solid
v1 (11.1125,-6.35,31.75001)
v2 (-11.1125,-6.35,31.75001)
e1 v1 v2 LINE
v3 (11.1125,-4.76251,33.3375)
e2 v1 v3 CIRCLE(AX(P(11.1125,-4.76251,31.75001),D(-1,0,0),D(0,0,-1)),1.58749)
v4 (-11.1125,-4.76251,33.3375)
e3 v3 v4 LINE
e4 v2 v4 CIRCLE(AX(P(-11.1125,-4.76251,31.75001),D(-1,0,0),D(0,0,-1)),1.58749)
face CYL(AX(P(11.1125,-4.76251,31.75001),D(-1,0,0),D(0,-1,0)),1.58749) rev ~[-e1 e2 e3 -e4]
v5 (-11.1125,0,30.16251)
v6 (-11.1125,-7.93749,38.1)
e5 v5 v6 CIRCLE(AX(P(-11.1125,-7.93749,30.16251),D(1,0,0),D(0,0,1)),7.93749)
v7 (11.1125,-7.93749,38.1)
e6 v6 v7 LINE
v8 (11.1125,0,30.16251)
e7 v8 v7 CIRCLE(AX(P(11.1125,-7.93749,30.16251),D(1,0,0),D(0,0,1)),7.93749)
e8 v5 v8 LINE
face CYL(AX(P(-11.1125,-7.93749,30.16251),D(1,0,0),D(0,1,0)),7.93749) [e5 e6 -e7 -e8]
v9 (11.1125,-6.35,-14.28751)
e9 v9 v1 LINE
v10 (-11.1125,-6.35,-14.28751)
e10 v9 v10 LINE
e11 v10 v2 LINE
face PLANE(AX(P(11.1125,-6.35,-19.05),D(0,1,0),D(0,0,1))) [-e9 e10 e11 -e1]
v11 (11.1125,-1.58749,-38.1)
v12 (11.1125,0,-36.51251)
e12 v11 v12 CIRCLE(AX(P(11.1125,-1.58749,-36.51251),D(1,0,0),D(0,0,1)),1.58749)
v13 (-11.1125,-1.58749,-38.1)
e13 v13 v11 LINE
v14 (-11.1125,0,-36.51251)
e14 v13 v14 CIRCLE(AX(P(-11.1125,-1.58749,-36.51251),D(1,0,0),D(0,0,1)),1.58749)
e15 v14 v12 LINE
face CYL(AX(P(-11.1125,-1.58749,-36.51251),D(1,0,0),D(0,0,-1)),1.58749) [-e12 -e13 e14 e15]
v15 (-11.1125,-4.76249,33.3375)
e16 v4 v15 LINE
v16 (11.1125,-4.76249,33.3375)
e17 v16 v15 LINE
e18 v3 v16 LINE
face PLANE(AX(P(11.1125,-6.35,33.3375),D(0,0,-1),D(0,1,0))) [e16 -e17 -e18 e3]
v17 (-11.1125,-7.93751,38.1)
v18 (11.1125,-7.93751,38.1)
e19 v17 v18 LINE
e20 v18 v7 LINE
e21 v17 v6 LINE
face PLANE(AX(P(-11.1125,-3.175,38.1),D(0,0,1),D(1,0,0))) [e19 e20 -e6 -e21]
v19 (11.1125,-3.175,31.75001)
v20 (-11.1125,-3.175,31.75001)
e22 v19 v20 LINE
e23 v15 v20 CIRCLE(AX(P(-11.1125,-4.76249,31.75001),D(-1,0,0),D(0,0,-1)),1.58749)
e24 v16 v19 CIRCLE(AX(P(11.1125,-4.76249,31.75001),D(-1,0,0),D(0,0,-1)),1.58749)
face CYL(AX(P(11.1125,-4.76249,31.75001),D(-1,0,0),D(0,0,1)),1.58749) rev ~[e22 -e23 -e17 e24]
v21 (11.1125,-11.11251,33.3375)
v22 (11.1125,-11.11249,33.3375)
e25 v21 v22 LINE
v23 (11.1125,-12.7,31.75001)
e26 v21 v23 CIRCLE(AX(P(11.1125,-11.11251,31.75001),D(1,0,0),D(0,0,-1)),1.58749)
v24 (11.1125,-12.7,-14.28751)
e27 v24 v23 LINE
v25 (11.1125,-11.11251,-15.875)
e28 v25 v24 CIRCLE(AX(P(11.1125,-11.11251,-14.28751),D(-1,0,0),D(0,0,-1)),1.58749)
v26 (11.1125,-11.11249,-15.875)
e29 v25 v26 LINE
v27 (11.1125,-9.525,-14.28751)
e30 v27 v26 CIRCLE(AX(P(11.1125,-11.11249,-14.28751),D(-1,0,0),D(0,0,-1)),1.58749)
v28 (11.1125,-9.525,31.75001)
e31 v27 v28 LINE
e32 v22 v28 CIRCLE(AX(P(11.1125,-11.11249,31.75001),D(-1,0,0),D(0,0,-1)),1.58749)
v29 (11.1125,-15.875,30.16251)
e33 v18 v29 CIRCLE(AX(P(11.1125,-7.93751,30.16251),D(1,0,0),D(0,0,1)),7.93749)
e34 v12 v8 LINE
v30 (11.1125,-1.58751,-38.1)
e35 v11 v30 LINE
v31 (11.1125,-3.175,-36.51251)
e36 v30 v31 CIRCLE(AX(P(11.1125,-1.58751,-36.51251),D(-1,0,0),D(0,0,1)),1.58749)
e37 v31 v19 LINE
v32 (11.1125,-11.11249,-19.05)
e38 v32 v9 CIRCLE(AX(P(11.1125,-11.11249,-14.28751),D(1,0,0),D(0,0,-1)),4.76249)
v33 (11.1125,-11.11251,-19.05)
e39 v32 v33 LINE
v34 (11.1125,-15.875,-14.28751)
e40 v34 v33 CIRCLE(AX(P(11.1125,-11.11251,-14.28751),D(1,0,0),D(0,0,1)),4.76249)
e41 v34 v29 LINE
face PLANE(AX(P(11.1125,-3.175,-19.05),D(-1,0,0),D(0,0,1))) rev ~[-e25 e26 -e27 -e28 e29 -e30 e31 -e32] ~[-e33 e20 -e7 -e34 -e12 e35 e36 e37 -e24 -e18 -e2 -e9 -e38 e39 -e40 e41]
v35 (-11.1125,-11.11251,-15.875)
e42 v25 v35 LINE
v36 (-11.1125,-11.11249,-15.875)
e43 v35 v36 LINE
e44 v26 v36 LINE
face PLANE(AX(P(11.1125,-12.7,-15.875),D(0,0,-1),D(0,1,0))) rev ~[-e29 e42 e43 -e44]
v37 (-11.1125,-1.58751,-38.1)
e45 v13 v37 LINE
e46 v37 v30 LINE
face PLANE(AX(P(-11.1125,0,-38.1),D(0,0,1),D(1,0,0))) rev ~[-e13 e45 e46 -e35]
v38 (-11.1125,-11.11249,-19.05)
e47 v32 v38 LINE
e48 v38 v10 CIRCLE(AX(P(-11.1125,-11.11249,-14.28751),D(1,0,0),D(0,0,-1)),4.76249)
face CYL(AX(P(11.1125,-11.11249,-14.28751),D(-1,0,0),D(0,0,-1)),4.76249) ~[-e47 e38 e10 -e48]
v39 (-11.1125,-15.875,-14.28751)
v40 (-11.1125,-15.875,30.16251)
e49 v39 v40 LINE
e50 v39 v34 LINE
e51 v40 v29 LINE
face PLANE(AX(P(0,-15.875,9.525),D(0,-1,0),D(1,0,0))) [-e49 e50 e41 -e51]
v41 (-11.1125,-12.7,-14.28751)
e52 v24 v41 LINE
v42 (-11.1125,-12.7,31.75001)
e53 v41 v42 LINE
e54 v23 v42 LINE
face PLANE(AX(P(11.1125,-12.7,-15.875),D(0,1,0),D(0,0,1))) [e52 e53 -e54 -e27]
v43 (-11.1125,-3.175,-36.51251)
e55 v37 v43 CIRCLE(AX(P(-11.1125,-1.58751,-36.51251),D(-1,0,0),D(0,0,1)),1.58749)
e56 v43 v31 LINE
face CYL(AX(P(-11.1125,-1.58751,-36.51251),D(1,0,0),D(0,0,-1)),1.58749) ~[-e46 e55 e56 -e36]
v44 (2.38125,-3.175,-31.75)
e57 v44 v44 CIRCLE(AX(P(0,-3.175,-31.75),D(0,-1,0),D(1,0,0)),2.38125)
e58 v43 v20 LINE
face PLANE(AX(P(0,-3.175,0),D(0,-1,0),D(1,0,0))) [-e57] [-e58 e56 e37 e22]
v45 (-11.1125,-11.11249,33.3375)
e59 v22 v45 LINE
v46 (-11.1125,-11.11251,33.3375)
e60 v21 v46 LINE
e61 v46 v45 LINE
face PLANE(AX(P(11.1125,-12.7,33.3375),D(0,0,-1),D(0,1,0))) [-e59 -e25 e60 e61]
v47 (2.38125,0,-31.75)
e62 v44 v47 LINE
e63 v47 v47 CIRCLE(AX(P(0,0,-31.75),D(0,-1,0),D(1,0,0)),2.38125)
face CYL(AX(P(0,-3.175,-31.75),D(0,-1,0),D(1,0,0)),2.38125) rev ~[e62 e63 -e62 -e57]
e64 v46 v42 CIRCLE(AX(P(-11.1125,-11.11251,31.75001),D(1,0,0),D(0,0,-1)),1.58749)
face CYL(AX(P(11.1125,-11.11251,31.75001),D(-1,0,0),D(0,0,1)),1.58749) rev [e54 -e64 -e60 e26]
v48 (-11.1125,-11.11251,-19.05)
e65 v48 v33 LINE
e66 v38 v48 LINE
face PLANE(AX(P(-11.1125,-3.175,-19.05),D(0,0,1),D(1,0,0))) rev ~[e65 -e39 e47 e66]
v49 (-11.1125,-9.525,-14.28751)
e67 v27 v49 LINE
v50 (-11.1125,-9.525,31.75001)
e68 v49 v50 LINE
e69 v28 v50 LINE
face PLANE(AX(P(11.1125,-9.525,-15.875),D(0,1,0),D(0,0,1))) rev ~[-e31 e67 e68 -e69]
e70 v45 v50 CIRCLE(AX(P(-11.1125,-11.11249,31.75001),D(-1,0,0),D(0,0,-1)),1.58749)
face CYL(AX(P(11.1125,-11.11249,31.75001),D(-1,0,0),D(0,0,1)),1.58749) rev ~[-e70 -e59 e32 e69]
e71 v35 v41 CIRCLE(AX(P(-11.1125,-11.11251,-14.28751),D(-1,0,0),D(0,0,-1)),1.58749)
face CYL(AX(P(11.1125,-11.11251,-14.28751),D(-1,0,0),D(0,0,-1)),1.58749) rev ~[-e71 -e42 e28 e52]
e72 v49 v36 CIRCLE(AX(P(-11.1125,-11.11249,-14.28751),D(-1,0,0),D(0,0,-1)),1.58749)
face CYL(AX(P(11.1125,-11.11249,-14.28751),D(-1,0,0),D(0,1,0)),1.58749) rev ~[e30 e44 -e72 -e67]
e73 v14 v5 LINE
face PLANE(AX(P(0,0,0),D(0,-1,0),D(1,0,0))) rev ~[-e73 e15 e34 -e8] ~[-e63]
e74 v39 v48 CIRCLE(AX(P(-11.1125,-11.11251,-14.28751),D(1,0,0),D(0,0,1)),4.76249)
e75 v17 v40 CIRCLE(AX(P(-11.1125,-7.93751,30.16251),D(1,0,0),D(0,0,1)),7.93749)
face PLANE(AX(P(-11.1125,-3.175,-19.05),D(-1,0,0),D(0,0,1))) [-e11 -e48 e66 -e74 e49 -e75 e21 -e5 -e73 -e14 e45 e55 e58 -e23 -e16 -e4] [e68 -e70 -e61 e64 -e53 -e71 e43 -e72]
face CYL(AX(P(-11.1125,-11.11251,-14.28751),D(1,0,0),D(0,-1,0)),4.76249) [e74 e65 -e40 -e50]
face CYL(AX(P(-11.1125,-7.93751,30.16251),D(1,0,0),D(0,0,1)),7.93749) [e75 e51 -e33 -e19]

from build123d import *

# Parameters (mm, degrees)
F8_W      = 22.225
F8_H      = 76.2
F9_DEPTH  = 3.175
F0_W      = 22.225
F0_H      = 57.15
F10_DEPTH = 12.7
F1_R      = 2.38125
F2_DEPTH  = 3.175
F3_W      = 3.175
F3_H      = 49.2125
F3_H_2    = 52.3875
F4_DEPTH  = 22.225
F5_R      = 1.58749
F6_R      = 7.93749
F7_R      = 4.76249


# Not quite as in the source:
# - a fillet or chamfer is up to 0.001 mm smaller than in the source, because OpenCascade refuses the exact size


with BuildPart() as f9:
    # F8 (on Front) → F9 (new body)
    with BuildSketch(Plane.XZ):
        Rectangle(F8_W, F8_H)
    extrude(amount=F9_DEPTH)

    # F0 (on face) → F10 (join)
    with BuildSketch(Plane.XZ.offset(3.175)):
        with Locations((0, 9.525)):
            Rectangle(F0_W, F0_H)
    extrude(amount=F10_DEPTH)

    # F1 (on face) → F2 (cut, through all)
    with BuildSketch(Plane.XZ.offset(3.175)):
        with Locations((0, -31.75)):
            Circle(F1_R)
    extrude(amount=-F2_DEPTH, mode=Mode.SUBTRACT)

    # F3 (on face) → F4 (cut, through all)
    with BuildSketch(Plane.YZ.offset(11.1125)):
        with Locations((-11.1125, 8.73125)):
            Rectangle(F3_W, F3_H)
        with Locations((-4.7625, 7.14375)):
            Rectangle(F3_W, F3_H_2)
    extrude(amount=-F4_DEPTH, mode=Mode.SUBTRACT)

    # F5 (radius 1.5875 in the source; OpenCascade refuses exactly that, so slightly less here)
    f5_edges = [f9.edges().sort_by_distance(p)[0] for p in [
        (0, -12.7, 33.3375),
        (0, -6.35, 33.3375),
        (0, -9.525, 33.3375),
        (0, -3.175, 33.3375),
        (0, -12.7, -15.875),
        (0, -9.525, -15.875),
        (0, 0, -38.1),
        (0, -3.175, -38.1),
    ]]
    fillet(f5_edges, radius=F5_R)

    # F6 (radius 7.9375 in the source; OpenCascade refuses exactly that, so slightly less here)
    f6_edges = [f9.edges().sort_by_distance(p)[0] for p in [
        (0, -15.875, 38.1),
        (0, 0, 38.1),
    ]]
    fillet(f6_edges, radius=F6_R)

    # F7 (radius 4.7625 in the source; OpenCascade refuses exactly that, so slightly less here)
    f7_edges = [f9.edges().sort_by_distance(p)[0] for p in [
        (0, -15.875, -19.05),
        (0, -6.35, -19.05),
    ]]
    fillet(f7_edges, radius=F7_R)


solid = f9.part
